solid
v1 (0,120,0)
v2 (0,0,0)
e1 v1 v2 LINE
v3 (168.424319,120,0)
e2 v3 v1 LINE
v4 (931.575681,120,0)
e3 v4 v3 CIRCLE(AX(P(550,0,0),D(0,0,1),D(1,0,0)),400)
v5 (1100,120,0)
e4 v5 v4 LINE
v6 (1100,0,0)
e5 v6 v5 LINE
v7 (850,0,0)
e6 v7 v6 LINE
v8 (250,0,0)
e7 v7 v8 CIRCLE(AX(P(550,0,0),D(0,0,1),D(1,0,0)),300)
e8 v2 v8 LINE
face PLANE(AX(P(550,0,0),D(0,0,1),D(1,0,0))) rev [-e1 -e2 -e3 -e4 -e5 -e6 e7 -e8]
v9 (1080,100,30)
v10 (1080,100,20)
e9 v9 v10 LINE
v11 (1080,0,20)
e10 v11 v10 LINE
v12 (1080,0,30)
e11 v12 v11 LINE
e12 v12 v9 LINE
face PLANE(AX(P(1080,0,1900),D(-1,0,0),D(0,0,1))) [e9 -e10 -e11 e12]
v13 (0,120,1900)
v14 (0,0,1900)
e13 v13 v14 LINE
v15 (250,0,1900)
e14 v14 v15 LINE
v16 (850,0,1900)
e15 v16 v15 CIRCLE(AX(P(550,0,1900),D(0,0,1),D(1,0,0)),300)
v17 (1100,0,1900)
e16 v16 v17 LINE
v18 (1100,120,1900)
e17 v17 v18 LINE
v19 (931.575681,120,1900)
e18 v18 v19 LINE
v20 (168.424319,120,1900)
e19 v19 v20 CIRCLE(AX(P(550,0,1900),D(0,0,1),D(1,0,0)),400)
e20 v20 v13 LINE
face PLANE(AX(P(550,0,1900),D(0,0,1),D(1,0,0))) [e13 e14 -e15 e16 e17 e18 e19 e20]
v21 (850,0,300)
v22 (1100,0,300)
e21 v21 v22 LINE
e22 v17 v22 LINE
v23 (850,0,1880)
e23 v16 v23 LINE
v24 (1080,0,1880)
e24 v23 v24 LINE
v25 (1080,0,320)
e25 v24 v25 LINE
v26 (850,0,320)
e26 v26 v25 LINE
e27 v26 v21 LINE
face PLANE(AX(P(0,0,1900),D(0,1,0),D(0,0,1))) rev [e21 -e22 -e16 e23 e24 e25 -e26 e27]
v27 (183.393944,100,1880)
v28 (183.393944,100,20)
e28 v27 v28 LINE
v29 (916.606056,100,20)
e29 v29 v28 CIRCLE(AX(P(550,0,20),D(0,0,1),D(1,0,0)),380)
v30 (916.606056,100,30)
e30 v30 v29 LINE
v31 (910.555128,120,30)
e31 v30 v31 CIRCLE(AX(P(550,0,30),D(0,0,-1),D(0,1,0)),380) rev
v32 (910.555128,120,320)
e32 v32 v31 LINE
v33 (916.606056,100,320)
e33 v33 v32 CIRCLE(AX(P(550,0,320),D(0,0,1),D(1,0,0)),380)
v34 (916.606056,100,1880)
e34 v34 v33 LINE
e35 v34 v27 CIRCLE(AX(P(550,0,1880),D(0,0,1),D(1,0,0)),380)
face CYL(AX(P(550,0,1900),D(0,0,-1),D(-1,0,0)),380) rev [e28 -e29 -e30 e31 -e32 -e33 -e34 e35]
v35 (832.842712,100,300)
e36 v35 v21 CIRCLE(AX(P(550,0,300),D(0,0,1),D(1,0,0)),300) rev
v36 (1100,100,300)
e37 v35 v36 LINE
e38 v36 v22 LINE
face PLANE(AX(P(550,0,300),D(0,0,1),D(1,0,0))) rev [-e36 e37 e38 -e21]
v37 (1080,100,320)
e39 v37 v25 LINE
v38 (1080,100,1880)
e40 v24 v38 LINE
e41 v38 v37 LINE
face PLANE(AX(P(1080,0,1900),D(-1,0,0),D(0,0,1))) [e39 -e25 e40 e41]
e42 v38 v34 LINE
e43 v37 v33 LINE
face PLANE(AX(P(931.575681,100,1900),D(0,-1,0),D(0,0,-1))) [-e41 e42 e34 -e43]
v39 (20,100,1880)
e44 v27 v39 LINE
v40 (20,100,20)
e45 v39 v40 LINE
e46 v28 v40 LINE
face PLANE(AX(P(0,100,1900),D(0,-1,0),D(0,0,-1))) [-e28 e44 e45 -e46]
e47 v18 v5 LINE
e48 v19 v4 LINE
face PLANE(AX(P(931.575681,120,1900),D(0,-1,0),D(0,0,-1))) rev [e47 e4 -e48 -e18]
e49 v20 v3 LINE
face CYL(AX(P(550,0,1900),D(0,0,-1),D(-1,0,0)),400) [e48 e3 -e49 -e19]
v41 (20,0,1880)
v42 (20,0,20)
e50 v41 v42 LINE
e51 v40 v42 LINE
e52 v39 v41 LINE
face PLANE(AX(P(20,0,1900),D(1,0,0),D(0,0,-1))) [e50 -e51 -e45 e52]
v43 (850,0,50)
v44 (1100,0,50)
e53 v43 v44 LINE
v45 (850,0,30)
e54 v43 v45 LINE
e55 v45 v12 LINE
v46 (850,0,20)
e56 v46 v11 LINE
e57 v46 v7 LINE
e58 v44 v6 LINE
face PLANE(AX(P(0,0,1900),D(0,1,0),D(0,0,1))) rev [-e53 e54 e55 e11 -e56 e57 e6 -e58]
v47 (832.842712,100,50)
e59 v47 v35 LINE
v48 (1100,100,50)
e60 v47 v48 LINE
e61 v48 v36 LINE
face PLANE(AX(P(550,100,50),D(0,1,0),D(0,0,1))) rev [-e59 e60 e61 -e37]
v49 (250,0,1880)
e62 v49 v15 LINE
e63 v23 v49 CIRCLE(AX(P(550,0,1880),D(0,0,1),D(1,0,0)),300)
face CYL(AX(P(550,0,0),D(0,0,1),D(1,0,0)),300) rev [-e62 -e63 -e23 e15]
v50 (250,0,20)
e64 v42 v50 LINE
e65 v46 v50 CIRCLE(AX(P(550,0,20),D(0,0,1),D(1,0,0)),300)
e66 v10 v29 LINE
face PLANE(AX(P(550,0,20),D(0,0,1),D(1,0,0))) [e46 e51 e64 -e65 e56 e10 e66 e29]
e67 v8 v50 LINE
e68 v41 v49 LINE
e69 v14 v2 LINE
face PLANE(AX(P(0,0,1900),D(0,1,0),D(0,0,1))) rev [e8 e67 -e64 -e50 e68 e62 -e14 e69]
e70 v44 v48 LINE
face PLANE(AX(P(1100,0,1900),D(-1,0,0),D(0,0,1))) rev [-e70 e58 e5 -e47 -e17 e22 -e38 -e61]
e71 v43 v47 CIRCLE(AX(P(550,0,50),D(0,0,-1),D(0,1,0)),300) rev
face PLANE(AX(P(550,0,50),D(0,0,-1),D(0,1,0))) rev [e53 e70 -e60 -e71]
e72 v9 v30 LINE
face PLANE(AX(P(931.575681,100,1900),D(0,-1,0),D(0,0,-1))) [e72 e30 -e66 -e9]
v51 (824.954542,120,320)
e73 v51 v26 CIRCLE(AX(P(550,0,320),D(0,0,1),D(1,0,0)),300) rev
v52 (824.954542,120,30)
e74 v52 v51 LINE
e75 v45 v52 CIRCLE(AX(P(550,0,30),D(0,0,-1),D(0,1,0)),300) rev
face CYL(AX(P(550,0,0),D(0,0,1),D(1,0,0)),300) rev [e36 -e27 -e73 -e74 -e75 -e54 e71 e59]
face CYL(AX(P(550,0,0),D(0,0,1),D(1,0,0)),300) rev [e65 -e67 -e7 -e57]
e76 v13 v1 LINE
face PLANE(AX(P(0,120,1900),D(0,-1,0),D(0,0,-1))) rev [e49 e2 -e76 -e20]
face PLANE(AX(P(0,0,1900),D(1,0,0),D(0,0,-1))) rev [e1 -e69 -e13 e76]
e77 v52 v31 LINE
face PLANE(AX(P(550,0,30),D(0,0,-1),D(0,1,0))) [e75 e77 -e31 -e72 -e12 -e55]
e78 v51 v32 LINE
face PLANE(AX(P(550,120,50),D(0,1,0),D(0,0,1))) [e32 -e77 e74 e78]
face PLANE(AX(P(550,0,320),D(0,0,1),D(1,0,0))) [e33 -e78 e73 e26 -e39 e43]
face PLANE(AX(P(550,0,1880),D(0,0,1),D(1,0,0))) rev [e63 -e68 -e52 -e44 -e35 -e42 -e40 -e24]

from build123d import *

# Parameters (mm, degrees)
BOSS_EXTRUDE1_DEPTH = 1900
SKETCH2_R           = 300
CUT_EXTRUDE1_DEPTH  = 2232.591360442
SKETCH4_W           = 250
SKETCH4_H           = 100
CUT_EXTRUDE3_DEPTH  = 550
SHELL1_START        = 320
SHELL1_DEPTH        = 1560
SHELL1_START_2      = 20
SHELL1_2_DEPTH      = 300
SHELL1_3_DEPTH      = 10


# Read off the part's stored shape, not the designer's step: Shell1
with BuildPart() as part:
    # Sketch1 → Boss-Extrude1 (new body)
    with BuildSketch(Plane.XY):
        with BuildLine():
            Line((931.575680567, 120), (1100, 120))
            Line((1100, 120), (1100, 0))
            Line((1100, 0), (0, 0))
            Line((0, 0), (0, 120))
            Line((0, 120), (168.424319433, 120))
            ThreePointArc((168.424319433, 120), (550, 400), (931.575680567, 120))
        make_face()
    extrude(amount=BOSS_EXTRUDE1_DEPTH)

    # Sketch2 → Cut-Extrude1 (cut, through all)
    with BuildSketch(Plane.XY.offset(1900)):
        with Locations((550, 0)):
            Circle(SKETCH2_R)
    extrude(amount=-CUT_EXTRUDE1_DEPTH, mode=Mode.SUBTRACT)

    # Sketch4 → Cut-Extrude3 (cut)
    with BuildSketch(Plane(origin=(1100, 0, 0), x_dir=(0, 0, -1), z_dir=(1, 0, 0))):
        with Locations((-175, 50)):
            Rectangle(SKETCH4_W, SKETCH4_H)
    extrude(amount=-CUT_EXTRUDE3_DEPTH, mode=Mode.SUBTRACT)

    # Shell1 outline → Shell1 (cut)
    with BuildSketch(Plane.XY.offset(SHELL1_START)):
        with BuildLine():
            ThreePointArc((916.606055596, 100), (550, 380), (183.393944404, 100))
            Line((183.393944404, 100), (20, 100))
            Line((20, 100), (20, 0))
            Line((20, 0), (250, 0))
            ThreePointArc((250, 0), (550, 300), (850, 0))
            Line((850, 0), (1080, 0))
            Line((1080, 0), (1080, 100))
            Line((1080, 100), (916.606055596, 100))
        make_face()
    extrude(amount=SHELL1_DEPTH, mode=Mode.SUBTRACT)

    # Shell1 2 outline → Shell1 2 (cut)
    with BuildSketch(Plane.XY.offset(SHELL1_START_2)):
        with BuildLine():
            Line((824.954541697, 120), (910.555127546, 120))
            ThreePointArc((910.555127546, 120), (539.552347988, 379.856349911), (183.393944404, 100))
            Line((183.393944404, 100), (20, 100))
            Line((20, 100), (20, 0))
            Line((20, 0), (250, 0))
            ThreePointArc((250, 0), (488.707106893, 293.671893879), (824.954541697, 120))
        make_face()
    extrude(amount=SHELL1_2_DEPTH, mode=Mode.SUBTRACT)

    # Shell1 3 outline → Shell1 3 (cut)
    with BuildSketch(Plane.XY.offset(SHELL1_START_2)):
        with BuildLine():
            ThreePointArc((916.606055596, 100), (913.718086665, 110.041598646), (910.555127546, 120))
            Line((910.555127546, 120), (824.954541697, 120))
            ThreePointArc((824.954541697, 120), (843.671893879, 61.292893107), (850, 0))
            Line((850, 0), (1080, 0))
            Line((1080, 0), (1080, 100))
            Line((1080, 100), (916.606055596, 100))
        make_face()
    extrude(amount=SHELL1_3_DEPTH, mode=Mode.SUBTRACT)


solid = part.part
